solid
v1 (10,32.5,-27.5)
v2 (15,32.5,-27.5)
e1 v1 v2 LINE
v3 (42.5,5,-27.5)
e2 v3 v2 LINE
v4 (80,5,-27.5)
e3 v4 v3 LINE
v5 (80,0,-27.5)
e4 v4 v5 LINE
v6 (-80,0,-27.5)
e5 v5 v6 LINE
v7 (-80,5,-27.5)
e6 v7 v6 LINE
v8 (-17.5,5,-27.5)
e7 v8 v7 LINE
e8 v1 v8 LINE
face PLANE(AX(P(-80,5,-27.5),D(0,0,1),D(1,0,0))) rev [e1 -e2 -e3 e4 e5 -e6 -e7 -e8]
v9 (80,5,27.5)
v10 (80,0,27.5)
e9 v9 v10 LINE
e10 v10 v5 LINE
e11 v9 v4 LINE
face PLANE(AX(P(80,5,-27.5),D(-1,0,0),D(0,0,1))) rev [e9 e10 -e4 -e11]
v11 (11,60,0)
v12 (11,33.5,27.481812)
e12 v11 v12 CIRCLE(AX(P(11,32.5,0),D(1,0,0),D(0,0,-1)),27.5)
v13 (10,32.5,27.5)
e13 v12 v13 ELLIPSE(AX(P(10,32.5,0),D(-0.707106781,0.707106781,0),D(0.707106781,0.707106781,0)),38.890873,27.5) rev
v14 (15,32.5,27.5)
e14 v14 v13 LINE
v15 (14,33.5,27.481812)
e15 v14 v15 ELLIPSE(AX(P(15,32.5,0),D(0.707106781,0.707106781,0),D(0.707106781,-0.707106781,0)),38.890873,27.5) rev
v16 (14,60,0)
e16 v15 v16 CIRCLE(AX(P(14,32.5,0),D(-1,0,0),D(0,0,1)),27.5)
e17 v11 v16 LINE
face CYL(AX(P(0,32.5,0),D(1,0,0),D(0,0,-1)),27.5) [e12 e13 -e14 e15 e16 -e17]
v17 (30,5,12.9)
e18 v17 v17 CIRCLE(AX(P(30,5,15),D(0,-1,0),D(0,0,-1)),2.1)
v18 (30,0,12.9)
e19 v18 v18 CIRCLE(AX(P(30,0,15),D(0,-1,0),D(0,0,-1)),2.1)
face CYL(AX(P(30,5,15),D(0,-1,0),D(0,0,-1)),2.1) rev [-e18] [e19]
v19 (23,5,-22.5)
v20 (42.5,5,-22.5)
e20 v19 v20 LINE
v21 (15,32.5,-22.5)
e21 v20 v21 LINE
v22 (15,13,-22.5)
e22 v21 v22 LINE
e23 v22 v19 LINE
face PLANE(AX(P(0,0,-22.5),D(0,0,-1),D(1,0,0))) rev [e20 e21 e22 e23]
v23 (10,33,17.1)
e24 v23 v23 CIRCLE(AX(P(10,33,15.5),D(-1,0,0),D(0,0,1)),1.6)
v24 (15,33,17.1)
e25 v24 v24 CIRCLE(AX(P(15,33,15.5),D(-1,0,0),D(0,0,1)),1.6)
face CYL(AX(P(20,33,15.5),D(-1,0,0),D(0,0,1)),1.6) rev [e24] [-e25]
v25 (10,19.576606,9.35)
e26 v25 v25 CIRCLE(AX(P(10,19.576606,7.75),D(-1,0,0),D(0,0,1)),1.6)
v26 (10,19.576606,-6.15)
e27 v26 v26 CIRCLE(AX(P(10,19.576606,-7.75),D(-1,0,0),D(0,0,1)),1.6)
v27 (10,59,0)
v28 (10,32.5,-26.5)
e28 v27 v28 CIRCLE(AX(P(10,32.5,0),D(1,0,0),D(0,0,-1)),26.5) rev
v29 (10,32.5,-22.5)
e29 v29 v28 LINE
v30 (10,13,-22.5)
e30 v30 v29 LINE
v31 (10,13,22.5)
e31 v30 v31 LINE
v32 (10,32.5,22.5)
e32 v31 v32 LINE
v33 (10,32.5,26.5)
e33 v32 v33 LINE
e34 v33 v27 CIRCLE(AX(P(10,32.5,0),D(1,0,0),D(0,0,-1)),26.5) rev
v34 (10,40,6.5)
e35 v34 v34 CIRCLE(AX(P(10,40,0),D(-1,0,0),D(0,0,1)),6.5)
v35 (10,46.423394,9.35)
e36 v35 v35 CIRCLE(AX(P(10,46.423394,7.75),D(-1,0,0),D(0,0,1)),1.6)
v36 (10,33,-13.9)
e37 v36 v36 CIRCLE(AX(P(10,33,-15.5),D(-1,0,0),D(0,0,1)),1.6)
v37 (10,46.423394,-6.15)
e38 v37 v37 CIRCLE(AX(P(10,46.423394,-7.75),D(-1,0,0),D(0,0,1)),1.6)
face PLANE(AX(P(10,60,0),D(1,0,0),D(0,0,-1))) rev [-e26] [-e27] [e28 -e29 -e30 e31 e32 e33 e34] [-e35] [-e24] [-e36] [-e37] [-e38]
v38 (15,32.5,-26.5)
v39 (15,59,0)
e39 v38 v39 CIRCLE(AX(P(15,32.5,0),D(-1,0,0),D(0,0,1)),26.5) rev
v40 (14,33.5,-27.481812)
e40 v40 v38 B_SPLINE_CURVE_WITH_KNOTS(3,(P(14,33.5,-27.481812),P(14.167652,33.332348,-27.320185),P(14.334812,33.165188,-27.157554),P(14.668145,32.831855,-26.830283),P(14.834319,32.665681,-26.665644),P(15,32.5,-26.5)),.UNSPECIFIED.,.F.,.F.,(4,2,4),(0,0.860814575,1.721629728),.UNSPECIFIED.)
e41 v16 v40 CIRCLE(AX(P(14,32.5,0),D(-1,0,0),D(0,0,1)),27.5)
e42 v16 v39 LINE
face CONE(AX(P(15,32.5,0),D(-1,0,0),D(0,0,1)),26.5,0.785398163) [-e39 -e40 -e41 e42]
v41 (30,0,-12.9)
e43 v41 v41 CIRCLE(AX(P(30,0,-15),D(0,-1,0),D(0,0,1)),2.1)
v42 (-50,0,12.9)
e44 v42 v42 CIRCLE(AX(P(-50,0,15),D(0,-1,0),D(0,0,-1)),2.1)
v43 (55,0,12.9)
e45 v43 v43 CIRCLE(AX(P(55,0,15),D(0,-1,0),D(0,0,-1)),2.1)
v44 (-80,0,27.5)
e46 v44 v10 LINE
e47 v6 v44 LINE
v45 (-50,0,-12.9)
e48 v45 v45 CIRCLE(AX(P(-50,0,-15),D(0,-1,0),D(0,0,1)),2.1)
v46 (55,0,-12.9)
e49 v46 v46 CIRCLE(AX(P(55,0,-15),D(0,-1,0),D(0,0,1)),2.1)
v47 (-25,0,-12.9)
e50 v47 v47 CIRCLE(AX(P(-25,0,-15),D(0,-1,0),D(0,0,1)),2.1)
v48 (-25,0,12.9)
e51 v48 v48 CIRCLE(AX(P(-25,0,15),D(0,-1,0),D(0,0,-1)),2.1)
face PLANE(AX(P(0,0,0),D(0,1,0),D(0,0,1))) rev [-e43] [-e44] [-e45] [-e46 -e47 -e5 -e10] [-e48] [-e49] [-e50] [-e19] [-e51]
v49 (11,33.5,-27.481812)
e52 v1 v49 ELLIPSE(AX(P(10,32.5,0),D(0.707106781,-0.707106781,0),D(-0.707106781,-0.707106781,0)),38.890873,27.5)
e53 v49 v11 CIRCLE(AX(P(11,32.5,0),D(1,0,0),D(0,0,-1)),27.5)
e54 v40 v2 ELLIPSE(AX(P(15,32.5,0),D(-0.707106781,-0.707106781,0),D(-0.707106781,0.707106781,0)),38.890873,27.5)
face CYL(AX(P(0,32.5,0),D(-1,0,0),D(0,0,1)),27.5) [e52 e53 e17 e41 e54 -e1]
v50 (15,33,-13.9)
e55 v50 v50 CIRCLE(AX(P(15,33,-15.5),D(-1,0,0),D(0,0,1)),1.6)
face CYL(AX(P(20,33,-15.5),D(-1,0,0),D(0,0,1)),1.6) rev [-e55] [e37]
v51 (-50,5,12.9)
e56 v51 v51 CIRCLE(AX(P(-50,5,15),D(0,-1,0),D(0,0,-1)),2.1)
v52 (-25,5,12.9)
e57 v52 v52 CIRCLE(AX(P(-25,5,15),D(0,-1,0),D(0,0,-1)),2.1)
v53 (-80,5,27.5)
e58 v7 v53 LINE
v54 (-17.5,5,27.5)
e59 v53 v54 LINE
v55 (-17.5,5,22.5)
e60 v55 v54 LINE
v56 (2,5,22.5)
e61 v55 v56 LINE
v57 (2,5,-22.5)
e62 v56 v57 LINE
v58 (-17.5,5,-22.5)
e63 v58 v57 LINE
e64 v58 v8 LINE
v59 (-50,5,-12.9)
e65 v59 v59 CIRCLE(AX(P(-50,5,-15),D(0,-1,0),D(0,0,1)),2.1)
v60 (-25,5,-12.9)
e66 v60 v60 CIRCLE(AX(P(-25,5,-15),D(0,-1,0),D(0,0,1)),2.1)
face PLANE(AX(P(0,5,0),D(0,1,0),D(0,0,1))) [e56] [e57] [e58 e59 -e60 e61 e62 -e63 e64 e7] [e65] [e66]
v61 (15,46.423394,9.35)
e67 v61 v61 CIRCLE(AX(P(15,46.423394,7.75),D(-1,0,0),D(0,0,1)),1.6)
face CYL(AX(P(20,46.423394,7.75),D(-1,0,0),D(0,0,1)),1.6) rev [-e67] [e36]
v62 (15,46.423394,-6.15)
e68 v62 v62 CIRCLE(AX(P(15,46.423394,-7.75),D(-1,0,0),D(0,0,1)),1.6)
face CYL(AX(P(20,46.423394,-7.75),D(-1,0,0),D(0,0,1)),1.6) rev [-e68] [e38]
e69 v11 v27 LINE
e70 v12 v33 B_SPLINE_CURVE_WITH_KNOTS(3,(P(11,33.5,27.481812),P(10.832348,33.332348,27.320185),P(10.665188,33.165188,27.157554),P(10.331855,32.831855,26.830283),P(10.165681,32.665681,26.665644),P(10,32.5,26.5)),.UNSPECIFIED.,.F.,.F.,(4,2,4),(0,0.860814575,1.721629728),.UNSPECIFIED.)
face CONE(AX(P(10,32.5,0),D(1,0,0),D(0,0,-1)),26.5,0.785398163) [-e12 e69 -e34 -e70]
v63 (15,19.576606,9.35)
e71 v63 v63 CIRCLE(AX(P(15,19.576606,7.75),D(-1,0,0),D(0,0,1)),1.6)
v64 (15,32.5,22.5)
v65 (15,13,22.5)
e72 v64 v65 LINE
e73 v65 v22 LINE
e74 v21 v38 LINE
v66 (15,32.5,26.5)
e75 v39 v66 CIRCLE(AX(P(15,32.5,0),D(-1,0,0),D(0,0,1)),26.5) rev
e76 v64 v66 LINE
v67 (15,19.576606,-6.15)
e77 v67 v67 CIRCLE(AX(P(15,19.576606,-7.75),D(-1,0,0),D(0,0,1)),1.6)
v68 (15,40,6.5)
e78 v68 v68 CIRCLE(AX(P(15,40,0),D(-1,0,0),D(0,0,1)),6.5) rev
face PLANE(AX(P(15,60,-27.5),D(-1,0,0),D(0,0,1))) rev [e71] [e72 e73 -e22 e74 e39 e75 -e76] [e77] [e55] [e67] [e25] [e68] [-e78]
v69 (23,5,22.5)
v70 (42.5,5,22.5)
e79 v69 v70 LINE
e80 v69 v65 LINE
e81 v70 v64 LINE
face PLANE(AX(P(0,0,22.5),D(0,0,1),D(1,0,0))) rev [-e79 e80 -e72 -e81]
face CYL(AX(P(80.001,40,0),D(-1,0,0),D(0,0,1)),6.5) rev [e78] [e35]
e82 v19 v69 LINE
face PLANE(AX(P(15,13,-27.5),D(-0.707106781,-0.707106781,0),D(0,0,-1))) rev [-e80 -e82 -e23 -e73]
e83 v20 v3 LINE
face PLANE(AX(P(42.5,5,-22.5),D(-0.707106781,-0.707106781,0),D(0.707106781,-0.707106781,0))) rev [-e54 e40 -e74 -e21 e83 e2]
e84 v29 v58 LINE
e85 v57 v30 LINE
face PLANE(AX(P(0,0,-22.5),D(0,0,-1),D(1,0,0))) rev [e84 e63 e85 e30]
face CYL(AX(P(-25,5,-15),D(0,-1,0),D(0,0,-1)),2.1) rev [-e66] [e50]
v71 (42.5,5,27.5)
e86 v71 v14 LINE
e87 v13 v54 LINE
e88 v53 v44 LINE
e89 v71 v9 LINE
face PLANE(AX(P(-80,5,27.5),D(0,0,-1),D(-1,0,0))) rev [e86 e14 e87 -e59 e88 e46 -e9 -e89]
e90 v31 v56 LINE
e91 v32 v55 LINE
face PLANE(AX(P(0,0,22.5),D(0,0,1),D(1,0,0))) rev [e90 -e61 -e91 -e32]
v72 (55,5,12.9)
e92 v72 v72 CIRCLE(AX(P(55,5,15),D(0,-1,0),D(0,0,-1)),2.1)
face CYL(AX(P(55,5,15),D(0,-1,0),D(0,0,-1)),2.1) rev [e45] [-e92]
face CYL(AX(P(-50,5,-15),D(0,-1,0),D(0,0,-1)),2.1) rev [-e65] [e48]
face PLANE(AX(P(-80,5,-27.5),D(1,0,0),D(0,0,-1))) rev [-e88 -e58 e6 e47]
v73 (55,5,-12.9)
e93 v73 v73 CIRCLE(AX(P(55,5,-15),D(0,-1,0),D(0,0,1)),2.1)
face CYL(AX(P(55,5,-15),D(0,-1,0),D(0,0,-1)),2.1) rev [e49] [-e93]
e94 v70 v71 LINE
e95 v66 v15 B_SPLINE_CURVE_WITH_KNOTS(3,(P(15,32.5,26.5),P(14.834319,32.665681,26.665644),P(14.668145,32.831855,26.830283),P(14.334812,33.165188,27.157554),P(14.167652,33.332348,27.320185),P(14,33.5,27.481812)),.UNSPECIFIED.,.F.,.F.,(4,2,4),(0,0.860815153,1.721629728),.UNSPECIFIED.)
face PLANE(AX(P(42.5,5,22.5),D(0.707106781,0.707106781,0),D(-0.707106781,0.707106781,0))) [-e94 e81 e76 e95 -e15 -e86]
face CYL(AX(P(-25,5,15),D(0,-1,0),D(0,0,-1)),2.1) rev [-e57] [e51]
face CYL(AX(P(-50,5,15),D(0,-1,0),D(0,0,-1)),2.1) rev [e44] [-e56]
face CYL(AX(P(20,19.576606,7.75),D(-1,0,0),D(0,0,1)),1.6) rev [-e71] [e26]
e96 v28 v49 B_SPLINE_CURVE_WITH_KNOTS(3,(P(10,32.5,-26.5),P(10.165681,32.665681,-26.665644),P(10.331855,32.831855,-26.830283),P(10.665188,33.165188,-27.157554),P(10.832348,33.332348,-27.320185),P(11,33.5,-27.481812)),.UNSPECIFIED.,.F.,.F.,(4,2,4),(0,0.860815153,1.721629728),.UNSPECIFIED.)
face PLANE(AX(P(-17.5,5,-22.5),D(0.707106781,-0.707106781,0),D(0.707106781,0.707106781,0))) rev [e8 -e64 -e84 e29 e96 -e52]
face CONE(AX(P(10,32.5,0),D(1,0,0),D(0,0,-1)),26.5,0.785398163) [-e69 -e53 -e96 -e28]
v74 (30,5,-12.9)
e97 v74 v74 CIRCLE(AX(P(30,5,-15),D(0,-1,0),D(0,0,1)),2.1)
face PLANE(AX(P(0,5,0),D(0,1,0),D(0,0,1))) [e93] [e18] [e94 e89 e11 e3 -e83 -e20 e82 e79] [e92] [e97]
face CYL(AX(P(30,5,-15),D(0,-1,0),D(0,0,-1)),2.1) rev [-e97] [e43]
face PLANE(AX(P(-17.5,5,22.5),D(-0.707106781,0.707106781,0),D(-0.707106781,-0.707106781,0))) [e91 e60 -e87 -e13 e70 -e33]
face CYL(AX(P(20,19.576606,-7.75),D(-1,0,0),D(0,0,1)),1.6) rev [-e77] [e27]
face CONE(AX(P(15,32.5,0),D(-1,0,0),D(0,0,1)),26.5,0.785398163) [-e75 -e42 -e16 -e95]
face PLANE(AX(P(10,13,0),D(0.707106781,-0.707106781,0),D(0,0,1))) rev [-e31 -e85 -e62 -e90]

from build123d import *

# Parameters (mm, degrees)
SKETCH_1_W          = 160
SKETCH_1_H          = 55
EXTRUDE_1_DEPTH     = 5
EXTRUDE_2_DEPTH     = 55
FILLET_1_R          = 27.5
CUT_EXTRUDE_1_REACH = 113.608
SKETCH_3_R          = 6.5
SKETCH_4_R          = 1.6
CUT_EXTRUDE_2_DEPTH = 10
CHAMFER_1_SIZE      = 8
CHAMFER_2_SIZE      = 8
EXTRUDE_5_DEPTH     = 5
CHAMFER_3_SIZE      = 1
SKETCH_7_R          = 2.1
CUT_EXTRUDE_3_DEPTH = 5


# Some blends are built 0.0001 mm under size
with BuildPart() as part:
    # 草图1 → 凸台-拉伸1 (new body)
    with BuildSketch(Plane(origin=(0, 0, 0), x_dir=(1, 0, 0), z_dir=(0, 1, 0))):
        Rectangle(SKETCH_1_W, SKETCH_1_H)
    extrude(amount=EXTRUDE_1_DEPTH)

    # 草图2 → 凸台-拉伸2 (add)
    with BuildSketch(Plane(origin=(0, 5, 0), x_dir=(1, 0, 0), z_dir=(0, 1, 0))):
        Polygon((10, 0), (10, 27.5), (15, 27.5), (15, -27.5), (10, -27.5), align=None)
    extrude(amount=EXTRUDE_2_DEPTH)

    # 圆角1
    fillet_1_edges = [part.edges().sort_by_distance(p)[0] for p in [
        (12.5, 60, -27.5),
        (12.5, 60, 27.5),
    ]]
    fillet(fillet_1_edges, radius=FILLET_1_R - 0.0001)  # a hair under: the kernel refuses the full size

    # 草图3 → 切除-拉伸1 (cut, up to next)
    with BuildSketch(Plane.ZY.offset(-10), mode=Mode.PRIVATE) as cut_extrude_1_sk1:
        with Locations((0, 40)):
            Circle(SKETCH_3_R)
    cut_extrude_1_tool1 = extrude(cut_extrude_1_sk1.sketch, amount=-CUT_EXTRUDE_1_REACH, mode=Mode.PRIVATE) & part.part
    add(cut_extrude_1_tool1.solids().sort_by_distance((10, 40, 0))[0], mode=Mode.SUBTRACT)

    # 草图4 → 切除-拉伸2 (cut)
    with BuildSketch(Plane.ZY.offset(-10)):
        with Locations((15.5, 33)):
            Circle(SKETCH_4_R)
        with Locations((7.75, 19.576606241)):
            Circle(SKETCH_4_R)
        with Locations((-7.75, 19.576606241)):
            Circle(SKETCH_4_R)
        with Locations((-15.5, 33)):
            Circle(SKETCH_4_R)
        with Locations((-7.75, 46.423393759)):
            Circle(SKETCH_4_R)
        with Locations((7.75, 46.423393759)):
            Circle(SKETCH_4_R)
    extrude(amount=-CUT_EXTRUDE_2_DEPTH, mode=Mode.SUBTRACT)

    # 倒角1
    chamfer_1_edges = [part.edges().sort_by_distance(p)[0] for p in [
        (10, 5, 0),
    ]]
    chamfer(chamfer_1_edges, length=CHAMFER_1_SIZE)

    # 倒角2
    chamfer_2_edges = [part.edges().sort_by_distance(p)[0] for p in [
        (15, 5, 0),
    ]]
    chamfer(chamfer_2_edges, length=CHAMFER_2_SIZE)

    # 草图6 → 凸台-拉伸5 (add)
    with BuildSketch(Plane.XY.offset(27.5)):
        Polygon((10, 5), (10, 32.5), (-17.5, 5), align=None)
        Polygon((15, 32.5), (15, 5), (42.5, 5), align=None)
    extrude_5 = extrude(amount=-EXTRUDE_5_DEPTH)

    # 镜向1: 凸台-拉伸5 across plane
    add(extrude_5.mirror(Plane.XY))

    # 倒角3
    # the kernel refuses this chamfer: 1 mm, written as the material it takes off along each edge
    with BuildSketch(Plane(origin=(10, 32.5001, 0.0001), x_dir=(0, -0.09341724291060717, 0.9956270480089322), z_dir=(0, -0.9956270480089322, -0.09341724291060717))) as chamfer_3_piece_1_section:
        Polygon((27.4999 - CHAMFER_3_SIZE, 0), (27.4999, -CHAMFER_3_SIZE), (27.4999, 0), align=None)
    chamfer_3_piece_1 = revolve(axis=Axis((10, 32.5001, 0.0001), (-1, 0, 0)), revolution_arc=100.720458749, mode=Mode.PRIVATE)
    chamfer_3_piece_1 = split(chamfer_3_piece_1, bisect_by=Plane(origin=(20.22926311, 42.72926311, 18.191765192), z_dir=(-0.7071067811865475, 0.7071067811865477, 0)), keep=Keep.TOP, mode=Mode.PRIVATE)
    add(chamfer_3_piece_1, mode=Mode.SUBTRACT)
    with BuildSketch(Plane(origin=(10, 32.5001, -0.0001), x_dir=(0, -0.09341724291060717, -0.9956270480089322), z_dir=(0, -0.9956270480089322, 0.09341724291060717))) as chamfer_3_piece_2_section:
        Polygon((27.4999, CHAMFER_3_SIZE), (27.4999 - CHAMFER_3_SIZE, 0), (27.4999, 0), align=None)
    chamfer_3_piece_2 = revolve(axis=Axis((10, 32.5001, -0.0001), (1, 0, 0)), revolution_arc=100.720458749, mode=Mode.PRIVATE)
    chamfer_3_piece_2 = split(chamfer_3_piece_2, bisect_by=Plane(origin=(20.397792602, 42.897792602, -19.088683077), z_dir=(-0.7071067811865475, 0.7071067811865477, 0)), keep=Keep.TOP, mode=Mode.PRIVATE)
    add(chamfer_3_piece_2, mode=Mode.SUBTRACT)
    with BuildSketch(Plane(origin=(15, 32.5001, 0.0001), x_dir=(0, -0.09341724291060717, 0.9956270480089322), z_dir=(0, -0.9956270480089322, -0.09341724291060717))) as chamfer_3_piece_3_section:
        Polygon((27.4999 - CHAMFER_3_SIZE, 0), (27.4999, CHAMFER_3_SIZE), (27.4999, 0), align=None)
    chamfer_3_piece_3 = revolve(axis=Axis((15, 32.5001, 0.0001), (-1, 0, 0)), revolution_arc=100.720458749, mode=Mode.PRIVATE)
    chamfer_3_piece_3 = split(chamfer_3_piece_3, bisect_by=Plane(origin=(4.77073689, 42.72926311, 18.191765192), z_dir=(0.7071067811865476, 0.7071067811865476, 0)), keep=Keep.TOP, mode=Mode.PRIVATE)
    add(chamfer_3_piece_3, mode=Mode.SUBTRACT)
    with BuildSketch(Plane(origin=(15, 32.5001, -0.0001), x_dir=(0, -0.09341724291060717, -0.9956270480089322), z_dir=(0, -0.9956270480089322, 0.09341724291060717))) as chamfer_3_piece_4_section:
        Polygon((27.4999 - CHAMFER_3_SIZE, 0), (27.4999, -CHAMFER_3_SIZE), (27.4999, 0), align=None)
    chamfer_3_piece_4 = revolve(axis=Axis((15, 32.5001, -0.0001), (1, 0, 0)), revolution_arc=100.720458749, mode=Mode.PRIVATE)
    chamfer_3_piece_4 = split(chamfer_3_piece_4, bisect_by=Plane(origin=(4.77073689, 42.72926311, -18.191765192), z_dir=(0.7071067811865476, 0.7071067811865476, 0)), keep=Keep.TOP, mode=Mode.PRIVATE)
    add(chamfer_3_piece_4, mode=Mode.SUBTRACT)

    # 草图7 → 切除-拉伸3 (cut)
    with BuildSketch(Plane(origin=(0, 0, 0), x_dir=(-1, 0, 0), z_dir=(0, -1, 0))):
        with Locations(Location((50, -15, 0), (0, 0, 90))):
            Circle(SKETCH_7_R)
        with Locations(Location((25, -15, 0), (0, 0, 90))):
            Circle(SKETCH_7_R)
        with Locations(Location((-30, -15, 0), (0, 0, 90))):
            Circle(SKETCH_7_R)
        with Locations(Location((-55, -15, 0), (0, 0, 90))):
            Circle(SKETCH_7_R)
        with Locations(Location((-55, 15, 0), (0, 0, 270))):
            Circle(SKETCH_7_R)
        with Locations(Location((-30, 15, 0), (0, 0, 270))):
            Circle(SKETCH_7_R)
        with Locations(Location((25, 15, 0), (0, 0, 270))):
            Circle(SKETCH_7_R)
        with Locations(Location((50, 15, 0), (0, 0, 270))):
            Circle(SKETCH_7_R)
    extrude(amount=-CUT_EXTRUDE_3_DEPTH, mode=Mode.SUBTRACT)


solid = part.part
